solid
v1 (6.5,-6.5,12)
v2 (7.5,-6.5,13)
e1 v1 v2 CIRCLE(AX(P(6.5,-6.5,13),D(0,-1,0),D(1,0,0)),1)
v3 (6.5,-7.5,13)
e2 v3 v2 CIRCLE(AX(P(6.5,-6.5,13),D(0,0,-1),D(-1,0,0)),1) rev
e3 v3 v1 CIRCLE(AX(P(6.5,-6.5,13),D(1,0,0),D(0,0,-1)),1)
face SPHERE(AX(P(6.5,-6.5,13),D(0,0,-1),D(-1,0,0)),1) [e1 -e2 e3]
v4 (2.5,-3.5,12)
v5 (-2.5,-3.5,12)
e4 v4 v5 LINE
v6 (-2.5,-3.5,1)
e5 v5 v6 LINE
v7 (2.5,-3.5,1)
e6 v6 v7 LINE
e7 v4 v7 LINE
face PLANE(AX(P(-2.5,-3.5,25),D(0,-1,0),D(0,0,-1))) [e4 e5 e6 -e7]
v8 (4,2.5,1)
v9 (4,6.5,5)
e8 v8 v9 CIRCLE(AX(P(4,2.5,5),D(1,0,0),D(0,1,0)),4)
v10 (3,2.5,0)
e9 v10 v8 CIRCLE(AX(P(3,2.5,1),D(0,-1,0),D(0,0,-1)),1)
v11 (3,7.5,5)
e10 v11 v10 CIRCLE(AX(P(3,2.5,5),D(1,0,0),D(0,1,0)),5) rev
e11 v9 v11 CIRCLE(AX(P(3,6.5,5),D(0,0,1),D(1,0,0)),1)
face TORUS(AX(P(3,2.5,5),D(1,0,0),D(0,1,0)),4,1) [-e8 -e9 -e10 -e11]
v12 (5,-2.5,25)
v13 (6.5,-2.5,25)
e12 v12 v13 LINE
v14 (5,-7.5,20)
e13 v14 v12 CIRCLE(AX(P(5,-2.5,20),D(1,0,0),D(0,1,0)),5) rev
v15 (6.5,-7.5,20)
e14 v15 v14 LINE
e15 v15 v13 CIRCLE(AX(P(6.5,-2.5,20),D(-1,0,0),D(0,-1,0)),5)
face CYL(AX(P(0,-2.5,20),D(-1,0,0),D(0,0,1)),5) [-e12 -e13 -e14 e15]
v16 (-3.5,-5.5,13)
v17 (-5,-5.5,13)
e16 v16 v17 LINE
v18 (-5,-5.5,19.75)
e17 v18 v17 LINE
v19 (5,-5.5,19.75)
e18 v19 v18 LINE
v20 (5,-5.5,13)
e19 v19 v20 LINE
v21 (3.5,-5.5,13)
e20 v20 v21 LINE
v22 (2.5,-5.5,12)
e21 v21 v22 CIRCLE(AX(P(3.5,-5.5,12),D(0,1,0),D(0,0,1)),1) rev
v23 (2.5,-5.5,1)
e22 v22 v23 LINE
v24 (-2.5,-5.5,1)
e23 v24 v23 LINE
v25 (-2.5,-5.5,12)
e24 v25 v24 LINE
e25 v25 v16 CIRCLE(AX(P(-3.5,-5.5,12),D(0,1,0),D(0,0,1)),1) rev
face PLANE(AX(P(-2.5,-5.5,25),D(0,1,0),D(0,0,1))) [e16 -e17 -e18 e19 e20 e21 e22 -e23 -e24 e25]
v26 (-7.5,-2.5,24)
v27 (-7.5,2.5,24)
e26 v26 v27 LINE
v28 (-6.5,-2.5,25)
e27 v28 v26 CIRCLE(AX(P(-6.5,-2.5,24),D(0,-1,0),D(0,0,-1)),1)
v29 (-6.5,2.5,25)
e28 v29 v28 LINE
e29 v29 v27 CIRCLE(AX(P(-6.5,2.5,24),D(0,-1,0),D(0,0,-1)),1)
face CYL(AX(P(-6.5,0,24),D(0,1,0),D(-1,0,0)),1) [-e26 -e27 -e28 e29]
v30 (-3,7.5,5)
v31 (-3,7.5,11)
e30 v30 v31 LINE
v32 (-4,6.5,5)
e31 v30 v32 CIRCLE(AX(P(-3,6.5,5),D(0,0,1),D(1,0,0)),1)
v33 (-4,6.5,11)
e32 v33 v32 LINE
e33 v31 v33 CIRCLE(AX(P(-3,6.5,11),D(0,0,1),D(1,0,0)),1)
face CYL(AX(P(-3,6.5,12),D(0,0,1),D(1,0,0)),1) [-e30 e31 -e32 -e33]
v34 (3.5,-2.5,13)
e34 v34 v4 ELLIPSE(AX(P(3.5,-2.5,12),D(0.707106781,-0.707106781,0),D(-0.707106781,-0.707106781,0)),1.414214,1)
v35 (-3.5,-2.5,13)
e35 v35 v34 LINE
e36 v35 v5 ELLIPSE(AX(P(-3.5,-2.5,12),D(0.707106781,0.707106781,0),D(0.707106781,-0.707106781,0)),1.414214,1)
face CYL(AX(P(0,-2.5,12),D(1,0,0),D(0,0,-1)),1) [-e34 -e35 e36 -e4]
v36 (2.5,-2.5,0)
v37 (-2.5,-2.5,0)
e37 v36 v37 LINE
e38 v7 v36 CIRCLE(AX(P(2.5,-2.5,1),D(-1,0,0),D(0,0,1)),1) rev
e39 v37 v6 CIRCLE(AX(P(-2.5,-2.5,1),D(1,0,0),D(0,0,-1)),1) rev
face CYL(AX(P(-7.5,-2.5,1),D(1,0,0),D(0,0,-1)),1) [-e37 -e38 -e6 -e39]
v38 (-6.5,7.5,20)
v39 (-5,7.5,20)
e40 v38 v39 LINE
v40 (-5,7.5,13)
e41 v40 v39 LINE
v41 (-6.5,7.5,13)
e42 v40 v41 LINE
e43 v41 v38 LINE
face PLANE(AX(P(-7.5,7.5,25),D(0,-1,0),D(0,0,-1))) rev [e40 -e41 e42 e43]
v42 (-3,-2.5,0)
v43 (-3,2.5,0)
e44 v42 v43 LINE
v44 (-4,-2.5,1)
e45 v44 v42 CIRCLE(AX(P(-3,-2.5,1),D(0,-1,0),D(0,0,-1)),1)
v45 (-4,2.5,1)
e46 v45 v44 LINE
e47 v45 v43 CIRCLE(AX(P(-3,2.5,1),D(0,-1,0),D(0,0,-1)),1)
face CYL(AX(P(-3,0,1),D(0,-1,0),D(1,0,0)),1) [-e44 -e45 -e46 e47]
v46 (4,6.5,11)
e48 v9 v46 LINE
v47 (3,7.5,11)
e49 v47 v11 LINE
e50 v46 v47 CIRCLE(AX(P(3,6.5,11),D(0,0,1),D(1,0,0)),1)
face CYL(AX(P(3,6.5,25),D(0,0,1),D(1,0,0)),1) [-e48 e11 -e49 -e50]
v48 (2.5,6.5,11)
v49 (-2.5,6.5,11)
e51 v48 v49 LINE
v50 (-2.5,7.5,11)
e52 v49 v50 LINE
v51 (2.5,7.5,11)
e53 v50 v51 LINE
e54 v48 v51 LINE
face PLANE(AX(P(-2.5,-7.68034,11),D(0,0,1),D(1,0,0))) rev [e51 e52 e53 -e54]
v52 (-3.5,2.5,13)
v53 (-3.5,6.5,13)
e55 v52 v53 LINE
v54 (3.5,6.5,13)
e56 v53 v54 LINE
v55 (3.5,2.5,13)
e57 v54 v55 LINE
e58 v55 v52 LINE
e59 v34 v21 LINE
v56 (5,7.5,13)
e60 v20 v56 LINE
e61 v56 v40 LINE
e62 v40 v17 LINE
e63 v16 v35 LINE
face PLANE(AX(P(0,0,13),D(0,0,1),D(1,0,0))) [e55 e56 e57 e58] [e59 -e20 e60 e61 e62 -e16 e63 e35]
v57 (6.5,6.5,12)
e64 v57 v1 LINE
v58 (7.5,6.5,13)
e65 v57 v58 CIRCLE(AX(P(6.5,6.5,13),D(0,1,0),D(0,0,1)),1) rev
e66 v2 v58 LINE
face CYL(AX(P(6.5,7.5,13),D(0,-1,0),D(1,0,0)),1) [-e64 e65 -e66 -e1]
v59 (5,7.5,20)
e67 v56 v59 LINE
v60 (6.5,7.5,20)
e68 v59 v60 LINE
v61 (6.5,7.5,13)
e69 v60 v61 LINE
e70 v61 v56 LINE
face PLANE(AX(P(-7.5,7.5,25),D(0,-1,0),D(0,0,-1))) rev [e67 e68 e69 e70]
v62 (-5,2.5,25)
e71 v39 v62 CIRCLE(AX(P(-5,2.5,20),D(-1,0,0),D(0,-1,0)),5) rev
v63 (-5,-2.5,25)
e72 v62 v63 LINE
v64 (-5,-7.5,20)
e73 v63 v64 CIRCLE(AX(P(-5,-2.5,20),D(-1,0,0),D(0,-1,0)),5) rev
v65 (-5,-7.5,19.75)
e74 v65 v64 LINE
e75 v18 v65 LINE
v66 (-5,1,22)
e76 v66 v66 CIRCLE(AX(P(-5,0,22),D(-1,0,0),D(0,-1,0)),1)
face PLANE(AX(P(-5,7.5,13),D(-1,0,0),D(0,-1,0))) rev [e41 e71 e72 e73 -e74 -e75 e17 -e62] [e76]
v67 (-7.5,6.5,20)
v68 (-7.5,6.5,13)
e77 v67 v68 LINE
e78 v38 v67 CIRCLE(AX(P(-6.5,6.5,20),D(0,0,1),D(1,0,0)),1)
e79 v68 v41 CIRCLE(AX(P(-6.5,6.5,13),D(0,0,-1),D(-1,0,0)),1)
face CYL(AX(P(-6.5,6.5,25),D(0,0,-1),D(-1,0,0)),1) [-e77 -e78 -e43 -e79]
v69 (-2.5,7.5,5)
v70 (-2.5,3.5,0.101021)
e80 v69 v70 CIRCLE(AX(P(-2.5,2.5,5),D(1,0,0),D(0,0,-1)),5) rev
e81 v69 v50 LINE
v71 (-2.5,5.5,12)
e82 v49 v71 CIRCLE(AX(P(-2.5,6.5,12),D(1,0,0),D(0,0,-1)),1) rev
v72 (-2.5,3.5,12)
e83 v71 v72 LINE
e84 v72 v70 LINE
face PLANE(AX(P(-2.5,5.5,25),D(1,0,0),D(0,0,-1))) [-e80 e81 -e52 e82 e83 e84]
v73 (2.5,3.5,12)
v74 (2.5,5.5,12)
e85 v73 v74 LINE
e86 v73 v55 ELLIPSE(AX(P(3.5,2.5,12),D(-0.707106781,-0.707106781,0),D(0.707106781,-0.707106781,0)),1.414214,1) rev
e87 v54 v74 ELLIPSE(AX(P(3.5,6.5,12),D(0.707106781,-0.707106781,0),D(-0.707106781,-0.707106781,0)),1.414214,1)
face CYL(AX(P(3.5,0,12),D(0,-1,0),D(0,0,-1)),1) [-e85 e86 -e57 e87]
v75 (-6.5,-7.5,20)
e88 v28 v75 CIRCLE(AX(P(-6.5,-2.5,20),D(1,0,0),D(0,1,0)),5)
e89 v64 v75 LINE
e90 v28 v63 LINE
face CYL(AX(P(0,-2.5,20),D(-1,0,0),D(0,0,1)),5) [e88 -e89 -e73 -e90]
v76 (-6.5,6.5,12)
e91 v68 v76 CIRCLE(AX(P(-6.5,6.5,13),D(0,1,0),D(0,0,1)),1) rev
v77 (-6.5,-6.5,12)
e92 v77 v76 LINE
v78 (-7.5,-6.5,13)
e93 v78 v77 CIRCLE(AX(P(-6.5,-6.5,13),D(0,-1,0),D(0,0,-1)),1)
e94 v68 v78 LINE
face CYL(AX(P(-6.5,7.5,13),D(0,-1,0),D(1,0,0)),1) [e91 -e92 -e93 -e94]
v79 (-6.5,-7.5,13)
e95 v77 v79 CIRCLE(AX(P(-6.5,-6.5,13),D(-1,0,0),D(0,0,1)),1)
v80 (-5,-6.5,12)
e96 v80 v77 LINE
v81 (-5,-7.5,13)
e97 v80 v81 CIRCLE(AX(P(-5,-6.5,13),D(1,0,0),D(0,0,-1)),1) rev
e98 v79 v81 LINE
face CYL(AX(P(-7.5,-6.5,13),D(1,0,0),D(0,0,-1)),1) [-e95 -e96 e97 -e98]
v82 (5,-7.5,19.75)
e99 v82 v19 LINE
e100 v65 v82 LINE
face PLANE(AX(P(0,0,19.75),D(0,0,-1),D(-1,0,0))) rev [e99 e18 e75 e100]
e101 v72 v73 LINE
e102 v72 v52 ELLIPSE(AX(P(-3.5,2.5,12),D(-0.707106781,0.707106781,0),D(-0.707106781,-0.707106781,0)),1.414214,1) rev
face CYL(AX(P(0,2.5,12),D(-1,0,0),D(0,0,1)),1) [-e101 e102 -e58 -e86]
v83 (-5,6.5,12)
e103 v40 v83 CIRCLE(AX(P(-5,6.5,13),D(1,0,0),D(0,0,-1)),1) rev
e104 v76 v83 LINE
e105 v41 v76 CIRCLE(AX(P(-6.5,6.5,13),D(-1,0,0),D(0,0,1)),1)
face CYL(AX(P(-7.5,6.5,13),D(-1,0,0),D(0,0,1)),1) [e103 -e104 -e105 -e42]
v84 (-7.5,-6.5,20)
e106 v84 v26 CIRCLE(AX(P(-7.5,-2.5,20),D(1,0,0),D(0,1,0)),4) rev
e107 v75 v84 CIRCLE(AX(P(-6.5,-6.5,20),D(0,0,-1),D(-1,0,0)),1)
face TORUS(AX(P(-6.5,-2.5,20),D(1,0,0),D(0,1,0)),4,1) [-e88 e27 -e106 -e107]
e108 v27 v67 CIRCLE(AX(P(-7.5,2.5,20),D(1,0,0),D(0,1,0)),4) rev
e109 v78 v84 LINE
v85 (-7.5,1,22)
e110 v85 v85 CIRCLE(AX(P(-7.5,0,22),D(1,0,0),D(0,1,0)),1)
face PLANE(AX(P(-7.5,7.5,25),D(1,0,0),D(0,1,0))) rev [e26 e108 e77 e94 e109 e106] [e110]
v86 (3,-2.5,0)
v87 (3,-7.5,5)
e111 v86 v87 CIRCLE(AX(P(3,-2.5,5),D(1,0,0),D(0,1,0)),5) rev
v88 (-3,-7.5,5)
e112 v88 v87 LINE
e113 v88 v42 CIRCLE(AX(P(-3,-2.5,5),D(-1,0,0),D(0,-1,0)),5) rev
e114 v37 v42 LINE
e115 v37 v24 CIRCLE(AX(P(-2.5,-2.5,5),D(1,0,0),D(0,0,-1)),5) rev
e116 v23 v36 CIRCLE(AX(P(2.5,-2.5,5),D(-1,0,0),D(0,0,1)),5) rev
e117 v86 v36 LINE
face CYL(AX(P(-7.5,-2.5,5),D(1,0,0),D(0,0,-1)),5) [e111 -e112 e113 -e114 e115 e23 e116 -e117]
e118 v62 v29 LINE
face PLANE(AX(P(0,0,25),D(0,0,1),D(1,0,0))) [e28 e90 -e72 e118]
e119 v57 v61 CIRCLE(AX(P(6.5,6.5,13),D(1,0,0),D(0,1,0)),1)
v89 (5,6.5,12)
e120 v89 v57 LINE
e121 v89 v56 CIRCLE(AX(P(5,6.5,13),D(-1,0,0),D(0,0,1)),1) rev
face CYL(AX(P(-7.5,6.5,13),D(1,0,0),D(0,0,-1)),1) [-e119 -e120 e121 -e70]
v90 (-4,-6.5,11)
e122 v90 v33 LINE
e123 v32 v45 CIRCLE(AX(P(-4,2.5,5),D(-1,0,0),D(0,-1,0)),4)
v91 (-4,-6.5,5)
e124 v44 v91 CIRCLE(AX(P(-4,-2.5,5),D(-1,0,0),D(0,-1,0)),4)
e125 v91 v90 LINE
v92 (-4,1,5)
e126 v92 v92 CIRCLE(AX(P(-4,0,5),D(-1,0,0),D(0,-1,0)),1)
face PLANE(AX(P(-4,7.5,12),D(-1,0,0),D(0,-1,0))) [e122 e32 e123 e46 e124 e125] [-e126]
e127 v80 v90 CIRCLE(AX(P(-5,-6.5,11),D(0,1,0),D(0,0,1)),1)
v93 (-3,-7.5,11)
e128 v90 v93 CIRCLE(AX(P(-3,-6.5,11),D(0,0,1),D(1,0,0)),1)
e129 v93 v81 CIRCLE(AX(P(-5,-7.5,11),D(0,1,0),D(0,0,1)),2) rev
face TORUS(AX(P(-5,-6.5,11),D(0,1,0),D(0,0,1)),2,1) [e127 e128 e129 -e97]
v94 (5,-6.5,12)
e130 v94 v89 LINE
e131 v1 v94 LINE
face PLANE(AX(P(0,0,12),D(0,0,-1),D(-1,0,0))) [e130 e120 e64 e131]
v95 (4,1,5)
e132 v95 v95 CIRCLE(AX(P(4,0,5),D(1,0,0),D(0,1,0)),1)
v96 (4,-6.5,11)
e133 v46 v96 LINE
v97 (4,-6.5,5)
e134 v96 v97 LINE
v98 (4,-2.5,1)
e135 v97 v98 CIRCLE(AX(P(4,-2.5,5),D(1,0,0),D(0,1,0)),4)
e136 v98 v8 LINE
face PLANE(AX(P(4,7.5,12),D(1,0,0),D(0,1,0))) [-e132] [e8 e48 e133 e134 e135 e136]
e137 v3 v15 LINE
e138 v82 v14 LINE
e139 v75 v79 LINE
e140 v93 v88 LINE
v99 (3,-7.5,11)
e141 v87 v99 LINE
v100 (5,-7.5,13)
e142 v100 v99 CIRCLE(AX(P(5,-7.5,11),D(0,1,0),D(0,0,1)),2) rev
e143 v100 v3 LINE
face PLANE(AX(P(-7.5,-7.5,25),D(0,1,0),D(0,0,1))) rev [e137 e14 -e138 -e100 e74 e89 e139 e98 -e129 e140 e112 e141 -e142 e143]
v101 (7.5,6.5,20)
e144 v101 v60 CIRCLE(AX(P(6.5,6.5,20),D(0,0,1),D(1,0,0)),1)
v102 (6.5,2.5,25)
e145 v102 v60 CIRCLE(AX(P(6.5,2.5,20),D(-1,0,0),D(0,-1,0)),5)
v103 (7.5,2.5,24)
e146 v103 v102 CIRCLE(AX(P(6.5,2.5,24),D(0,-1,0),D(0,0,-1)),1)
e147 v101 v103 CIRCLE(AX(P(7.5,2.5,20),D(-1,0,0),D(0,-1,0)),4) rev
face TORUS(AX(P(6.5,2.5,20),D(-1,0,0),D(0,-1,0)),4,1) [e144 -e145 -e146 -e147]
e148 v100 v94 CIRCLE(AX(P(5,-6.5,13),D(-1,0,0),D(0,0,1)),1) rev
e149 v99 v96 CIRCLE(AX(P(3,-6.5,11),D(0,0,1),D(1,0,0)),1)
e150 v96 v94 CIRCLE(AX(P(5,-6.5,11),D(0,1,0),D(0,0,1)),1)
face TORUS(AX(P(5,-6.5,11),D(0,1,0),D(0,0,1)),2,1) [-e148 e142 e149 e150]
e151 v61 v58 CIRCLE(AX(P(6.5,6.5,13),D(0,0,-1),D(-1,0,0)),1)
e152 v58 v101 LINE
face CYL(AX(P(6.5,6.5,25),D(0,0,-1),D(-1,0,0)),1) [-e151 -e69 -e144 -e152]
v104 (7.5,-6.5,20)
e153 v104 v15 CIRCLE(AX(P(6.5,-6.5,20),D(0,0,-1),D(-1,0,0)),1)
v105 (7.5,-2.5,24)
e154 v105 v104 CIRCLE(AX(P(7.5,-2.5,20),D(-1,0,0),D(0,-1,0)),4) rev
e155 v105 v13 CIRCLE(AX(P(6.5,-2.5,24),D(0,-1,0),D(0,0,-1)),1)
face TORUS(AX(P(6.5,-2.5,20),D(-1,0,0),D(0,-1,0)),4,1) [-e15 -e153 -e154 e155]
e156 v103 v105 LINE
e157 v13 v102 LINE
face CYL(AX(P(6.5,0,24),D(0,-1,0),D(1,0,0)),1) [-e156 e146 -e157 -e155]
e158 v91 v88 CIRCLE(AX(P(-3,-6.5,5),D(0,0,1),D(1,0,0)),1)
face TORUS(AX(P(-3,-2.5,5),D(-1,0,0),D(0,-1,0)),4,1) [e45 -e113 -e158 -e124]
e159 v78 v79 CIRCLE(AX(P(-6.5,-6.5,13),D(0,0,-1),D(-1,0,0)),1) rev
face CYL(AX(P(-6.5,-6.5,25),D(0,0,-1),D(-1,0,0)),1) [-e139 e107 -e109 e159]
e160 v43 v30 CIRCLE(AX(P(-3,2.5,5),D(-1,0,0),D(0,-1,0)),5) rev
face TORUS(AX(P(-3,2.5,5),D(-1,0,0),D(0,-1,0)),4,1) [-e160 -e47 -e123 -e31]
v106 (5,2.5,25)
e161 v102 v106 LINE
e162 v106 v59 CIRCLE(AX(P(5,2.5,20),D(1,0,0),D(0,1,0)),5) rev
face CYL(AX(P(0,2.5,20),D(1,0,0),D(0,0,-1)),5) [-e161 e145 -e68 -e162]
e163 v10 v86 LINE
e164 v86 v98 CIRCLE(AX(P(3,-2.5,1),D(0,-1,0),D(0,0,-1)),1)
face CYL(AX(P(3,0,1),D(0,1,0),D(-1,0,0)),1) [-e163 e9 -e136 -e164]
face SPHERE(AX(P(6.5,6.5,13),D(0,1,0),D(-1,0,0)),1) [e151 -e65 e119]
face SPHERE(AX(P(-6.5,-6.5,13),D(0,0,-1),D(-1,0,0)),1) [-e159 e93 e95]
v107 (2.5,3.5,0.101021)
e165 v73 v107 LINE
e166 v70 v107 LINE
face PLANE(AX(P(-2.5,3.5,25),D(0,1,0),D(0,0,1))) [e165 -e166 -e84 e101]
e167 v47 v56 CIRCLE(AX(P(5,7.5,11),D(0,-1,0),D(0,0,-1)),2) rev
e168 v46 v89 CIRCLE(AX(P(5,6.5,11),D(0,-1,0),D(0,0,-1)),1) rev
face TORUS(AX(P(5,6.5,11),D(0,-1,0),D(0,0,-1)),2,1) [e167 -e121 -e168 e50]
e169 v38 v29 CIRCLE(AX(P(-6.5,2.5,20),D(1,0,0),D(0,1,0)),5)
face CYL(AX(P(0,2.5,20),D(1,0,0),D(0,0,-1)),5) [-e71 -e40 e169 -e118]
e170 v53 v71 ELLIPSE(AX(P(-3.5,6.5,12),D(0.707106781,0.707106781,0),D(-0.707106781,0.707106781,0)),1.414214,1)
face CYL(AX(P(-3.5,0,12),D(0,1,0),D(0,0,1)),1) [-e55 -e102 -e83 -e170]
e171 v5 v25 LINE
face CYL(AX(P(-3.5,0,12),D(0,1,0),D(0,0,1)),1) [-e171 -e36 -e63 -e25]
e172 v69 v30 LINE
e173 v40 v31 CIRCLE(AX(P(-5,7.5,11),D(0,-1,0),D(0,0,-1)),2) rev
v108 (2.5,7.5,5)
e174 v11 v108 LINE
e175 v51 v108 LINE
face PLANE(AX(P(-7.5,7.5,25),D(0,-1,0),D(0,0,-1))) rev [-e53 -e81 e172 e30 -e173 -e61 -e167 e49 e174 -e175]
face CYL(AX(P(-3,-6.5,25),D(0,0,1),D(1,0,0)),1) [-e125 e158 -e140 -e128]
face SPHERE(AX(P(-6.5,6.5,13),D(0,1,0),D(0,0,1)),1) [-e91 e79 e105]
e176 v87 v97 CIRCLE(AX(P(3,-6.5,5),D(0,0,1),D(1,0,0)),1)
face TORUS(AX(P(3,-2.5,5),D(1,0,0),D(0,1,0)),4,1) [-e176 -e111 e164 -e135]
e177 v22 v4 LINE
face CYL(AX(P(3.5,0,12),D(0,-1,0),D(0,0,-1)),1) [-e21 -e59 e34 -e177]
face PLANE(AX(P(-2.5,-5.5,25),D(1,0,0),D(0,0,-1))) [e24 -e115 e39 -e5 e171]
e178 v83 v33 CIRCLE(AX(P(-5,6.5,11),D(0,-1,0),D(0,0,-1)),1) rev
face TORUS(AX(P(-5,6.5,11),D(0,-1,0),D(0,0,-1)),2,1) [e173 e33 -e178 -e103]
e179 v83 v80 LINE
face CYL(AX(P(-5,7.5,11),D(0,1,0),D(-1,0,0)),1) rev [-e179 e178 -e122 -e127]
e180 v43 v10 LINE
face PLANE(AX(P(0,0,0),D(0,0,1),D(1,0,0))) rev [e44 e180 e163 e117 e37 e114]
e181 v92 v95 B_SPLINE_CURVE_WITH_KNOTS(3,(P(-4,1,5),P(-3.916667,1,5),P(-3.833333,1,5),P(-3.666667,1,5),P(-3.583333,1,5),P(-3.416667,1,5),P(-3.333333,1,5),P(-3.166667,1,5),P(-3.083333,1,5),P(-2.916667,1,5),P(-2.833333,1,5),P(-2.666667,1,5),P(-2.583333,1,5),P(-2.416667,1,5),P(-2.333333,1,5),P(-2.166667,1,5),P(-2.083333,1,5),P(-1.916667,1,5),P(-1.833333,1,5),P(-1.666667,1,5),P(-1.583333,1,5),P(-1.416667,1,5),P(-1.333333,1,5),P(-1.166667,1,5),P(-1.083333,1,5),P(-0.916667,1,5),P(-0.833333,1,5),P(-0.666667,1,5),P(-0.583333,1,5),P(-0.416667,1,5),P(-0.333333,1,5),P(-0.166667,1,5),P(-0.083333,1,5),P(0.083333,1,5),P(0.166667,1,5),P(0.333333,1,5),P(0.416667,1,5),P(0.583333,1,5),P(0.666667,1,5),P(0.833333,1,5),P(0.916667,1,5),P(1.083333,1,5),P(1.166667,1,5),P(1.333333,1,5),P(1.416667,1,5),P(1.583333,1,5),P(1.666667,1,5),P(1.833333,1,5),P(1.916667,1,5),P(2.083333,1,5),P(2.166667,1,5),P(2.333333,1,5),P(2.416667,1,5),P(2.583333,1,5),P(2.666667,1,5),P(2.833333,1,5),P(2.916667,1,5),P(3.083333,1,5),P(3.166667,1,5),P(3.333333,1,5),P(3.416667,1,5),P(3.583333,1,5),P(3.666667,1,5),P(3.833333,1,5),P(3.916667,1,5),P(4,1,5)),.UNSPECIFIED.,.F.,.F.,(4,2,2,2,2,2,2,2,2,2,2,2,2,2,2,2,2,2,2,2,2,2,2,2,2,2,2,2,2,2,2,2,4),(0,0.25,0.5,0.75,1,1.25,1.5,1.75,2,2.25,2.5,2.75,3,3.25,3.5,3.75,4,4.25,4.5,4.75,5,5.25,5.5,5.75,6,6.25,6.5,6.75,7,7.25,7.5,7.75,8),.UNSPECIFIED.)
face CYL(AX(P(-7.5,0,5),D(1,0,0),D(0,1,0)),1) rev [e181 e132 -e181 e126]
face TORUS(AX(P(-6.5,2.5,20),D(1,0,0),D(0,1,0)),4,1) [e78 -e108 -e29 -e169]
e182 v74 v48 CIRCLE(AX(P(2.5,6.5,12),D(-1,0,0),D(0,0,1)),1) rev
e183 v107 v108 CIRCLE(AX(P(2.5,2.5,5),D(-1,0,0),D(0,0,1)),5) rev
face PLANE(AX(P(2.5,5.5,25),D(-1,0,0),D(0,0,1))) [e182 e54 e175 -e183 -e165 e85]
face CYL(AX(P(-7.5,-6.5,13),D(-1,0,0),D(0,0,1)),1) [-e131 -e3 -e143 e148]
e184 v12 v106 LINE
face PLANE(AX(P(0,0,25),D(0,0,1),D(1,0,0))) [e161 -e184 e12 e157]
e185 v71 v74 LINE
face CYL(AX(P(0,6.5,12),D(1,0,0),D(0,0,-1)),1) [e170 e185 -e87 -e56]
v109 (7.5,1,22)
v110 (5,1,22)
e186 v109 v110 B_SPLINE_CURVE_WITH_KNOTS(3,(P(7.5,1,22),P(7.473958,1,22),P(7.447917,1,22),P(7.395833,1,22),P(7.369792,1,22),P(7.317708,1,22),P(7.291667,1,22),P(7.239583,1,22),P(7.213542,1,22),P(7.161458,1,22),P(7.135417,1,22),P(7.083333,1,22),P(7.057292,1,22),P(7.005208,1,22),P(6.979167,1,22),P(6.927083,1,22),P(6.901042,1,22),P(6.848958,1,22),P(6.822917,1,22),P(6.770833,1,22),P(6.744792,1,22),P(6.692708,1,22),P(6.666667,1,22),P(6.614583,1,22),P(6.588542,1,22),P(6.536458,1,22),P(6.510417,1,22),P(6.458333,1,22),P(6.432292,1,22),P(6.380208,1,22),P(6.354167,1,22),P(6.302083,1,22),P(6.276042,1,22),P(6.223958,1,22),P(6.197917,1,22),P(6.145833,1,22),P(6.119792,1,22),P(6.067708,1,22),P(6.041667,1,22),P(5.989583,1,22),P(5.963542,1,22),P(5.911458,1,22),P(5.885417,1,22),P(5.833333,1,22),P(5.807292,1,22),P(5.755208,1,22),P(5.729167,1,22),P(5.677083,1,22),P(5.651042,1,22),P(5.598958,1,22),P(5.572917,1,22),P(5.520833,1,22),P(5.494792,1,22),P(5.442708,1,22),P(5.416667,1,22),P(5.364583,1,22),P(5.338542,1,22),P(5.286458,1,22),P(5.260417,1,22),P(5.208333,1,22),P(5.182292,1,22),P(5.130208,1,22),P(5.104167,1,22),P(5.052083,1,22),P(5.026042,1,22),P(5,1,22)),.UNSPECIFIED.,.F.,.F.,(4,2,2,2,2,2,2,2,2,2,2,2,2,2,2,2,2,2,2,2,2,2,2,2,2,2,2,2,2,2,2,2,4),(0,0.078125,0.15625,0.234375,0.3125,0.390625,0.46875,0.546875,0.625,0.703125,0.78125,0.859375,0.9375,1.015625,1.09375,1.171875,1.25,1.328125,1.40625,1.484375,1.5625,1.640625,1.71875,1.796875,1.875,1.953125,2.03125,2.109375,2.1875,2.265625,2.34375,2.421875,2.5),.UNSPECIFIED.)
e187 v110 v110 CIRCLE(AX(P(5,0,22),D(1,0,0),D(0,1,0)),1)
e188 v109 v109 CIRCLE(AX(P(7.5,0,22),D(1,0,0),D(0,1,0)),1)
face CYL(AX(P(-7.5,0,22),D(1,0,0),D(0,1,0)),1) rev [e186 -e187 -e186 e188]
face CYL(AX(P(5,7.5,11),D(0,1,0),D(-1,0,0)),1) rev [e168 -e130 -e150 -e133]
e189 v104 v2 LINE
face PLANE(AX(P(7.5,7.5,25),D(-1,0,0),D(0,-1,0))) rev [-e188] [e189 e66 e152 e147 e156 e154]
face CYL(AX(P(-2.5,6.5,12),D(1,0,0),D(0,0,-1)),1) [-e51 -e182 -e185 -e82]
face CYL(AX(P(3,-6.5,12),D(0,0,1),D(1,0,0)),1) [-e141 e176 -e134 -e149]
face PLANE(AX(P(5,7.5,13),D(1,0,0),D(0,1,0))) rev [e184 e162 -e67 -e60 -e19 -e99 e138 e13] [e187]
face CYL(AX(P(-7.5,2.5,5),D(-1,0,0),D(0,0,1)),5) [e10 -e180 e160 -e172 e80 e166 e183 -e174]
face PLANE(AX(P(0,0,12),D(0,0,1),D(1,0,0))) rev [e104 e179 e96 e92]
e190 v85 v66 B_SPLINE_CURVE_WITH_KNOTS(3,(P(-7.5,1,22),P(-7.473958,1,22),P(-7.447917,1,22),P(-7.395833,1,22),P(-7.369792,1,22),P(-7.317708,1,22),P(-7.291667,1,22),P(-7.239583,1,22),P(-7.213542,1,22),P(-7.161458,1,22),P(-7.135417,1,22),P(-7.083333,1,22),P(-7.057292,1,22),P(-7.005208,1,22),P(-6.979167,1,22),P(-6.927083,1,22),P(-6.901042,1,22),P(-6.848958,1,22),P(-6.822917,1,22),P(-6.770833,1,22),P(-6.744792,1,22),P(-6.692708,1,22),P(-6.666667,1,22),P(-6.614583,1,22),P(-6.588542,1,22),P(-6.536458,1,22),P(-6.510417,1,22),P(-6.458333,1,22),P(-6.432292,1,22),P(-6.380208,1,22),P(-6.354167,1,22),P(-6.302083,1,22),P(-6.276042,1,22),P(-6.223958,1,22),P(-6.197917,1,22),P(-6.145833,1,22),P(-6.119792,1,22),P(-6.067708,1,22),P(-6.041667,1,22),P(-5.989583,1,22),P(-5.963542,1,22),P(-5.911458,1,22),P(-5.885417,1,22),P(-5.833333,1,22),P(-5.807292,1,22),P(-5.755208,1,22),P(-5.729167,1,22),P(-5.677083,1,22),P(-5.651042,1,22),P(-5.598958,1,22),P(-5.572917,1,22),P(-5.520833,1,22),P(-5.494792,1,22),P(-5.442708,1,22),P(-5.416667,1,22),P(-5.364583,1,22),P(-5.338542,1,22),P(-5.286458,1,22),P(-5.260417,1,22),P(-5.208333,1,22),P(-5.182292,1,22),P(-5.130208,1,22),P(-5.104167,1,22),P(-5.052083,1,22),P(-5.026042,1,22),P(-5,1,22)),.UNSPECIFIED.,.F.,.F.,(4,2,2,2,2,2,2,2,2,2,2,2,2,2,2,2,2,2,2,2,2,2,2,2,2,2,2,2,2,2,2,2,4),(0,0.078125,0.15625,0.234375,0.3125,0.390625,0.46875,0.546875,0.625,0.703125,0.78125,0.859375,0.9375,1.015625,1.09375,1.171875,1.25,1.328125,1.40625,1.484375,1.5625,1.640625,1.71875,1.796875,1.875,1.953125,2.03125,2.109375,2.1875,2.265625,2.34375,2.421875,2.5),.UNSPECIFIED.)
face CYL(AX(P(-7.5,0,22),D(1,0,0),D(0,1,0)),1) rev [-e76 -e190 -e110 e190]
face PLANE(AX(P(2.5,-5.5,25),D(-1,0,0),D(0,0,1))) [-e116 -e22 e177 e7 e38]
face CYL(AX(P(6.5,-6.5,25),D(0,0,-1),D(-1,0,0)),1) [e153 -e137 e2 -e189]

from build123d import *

# Parameters (mm, degrees)
BASE_SKETCH_W                    = 15
BASE_SKETCH_H                    = 15
BASE_SKETCH_EXTRUDE_DEPTH        = 25
CENTER_NUB_CUTOUT_SKETCH_W       = 3.5
CENTER_NUB_CUTOUT_SKETCH_H       = 15
HINGE_NUB_EXTRUDED_CUT_DEPTH     = 12
HINGE_CUTOUT_SKETCH_W            = 10
HINGE_CUTOUT_SKETCH_H            = 15
HINGE_CUTOUT_EXTRUDED_CUT_DEPTH  = 12
HINGE_HOLE_SKETCH_R              = 1
HINGE_HOLE_EXTRUDED_CUT_DEPTH    = 31.103986447
CORNER_FILLETS_R                 = 5
STYLE_FILLETS_R                  = 1
ROUTING_HOLES_SKETCH_W           = 5
ROUTING_HOLES_SKETCH_H           = 2
ROUTING_HOLES_EXTRUDED_CUT_DEPTH = 28.156951228
SKETCH1_W                        = 10
SKETCH1_H                        = 2
BACKING_EXTRUDE_DEPTH            = 6.75
EXTRA_ROUTING_CUT_SKETCH_W       = 5
EXTRA_ROUTING_CUT_SKETCH_H       = 10
EXTRA_ROUTING_EXTRUDED_CUT_DEPTH = 4
ROUTING_FILLETS_R                = 1


with BuildPart() as part:
    # Base Sketch → Base Sketch Extrude (new body)
    with BuildSketch(Plane.XY):
        Rectangle(BASE_SKETCH_W, BASE_SKETCH_H)
    extrude(amount=BASE_SKETCH_EXTRUDE_DEPTH)

    # Center Nub Cutout Sketch → Hinge Nub Extruded Cut (cut)
    with BuildSketch(Plane.XY):
        with Locations((5.75, 0)):
            Rectangle(CENTER_NUB_CUTOUT_SKETCH_W, CENTER_NUB_CUTOUT_SKETCH_H)
        with Locations((-5.75, 0)):
            Rectangle(CENTER_NUB_CUTOUT_SKETCH_W, CENTER_NUB_CUTOUT_SKETCH_H)
    extrude(amount=HINGE_NUB_EXTRUDED_CUT_DEPTH, mode=Mode.SUBTRACT)

    # Hinge Cutout Sketch → Hinge Cutout Extruded Cut (cut)
    with BuildSketch(Plane.XY.offset(25)):
        Rectangle(HINGE_CUTOUT_SKETCH_W, HINGE_CUTOUT_SKETCH_H)
    extrude(amount=-HINGE_CUTOUT_EXTRUDED_CUT_DEPTH, mode=Mode.SUBTRACT)

    # Hinge Hole Sketch → Hinge Hole Extruded Cut (cut, through all)
    with BuildSketch(Plane(origin=(7.5, 0, 0), x_dir=(0, 0, -1), z_dir=(1, 0, 0))):
        with Locations(Location((-5, 0, 0), (0, 0, 90))):
            Circle(HINGE_HOLE_SKETCH_R)
        with Locations(Location((-22, 0, 0), (0, 0, 90))):
            Circle(HINGE_HOLE_SKETCH_R)
    extrude(amount=-HINGE_HOLE_EXTRUDED_CUT_DEPTH, mode=Mode.SUBTRACT)

    # Corner Fillets
    corner_fillets_edges = [part.edges().sort_by_distance(p)[0] for p in [
        (0, -7.5, 0),
        (0, 7.5, 0),
        (-6.25, -7.5, 25),
        (-6.25, 7.5, 25),
        (6.25, -7.5, 25),
        (6.25, 7.5, 25),
    ]]
    fillet(corner_fillets_edges, radius=CORNER_FILLETS_R)

    # Style Fillets
    style_fillets_edges = [part.edges().sort_by_distance(p)[0] for p in [
        (4, 7.5, 8.5),
        (4, -7.5, 8.5),
        (7.5, 0, 12),
        (5.75, 7.5, 12),
        (4, 0, 12),
        (5.75, -7.5, 12),
        (-4, -7.5, 8.5),
        (-4, 7.5, 8.5),
        (-7.5, 0, 12),
        (-5.75, -7.5, 12),
        (-4, 0, 12),
        (-5.75, 7.5, 12),
        (-7.5, 0, 25),
        (-7.5, -7.5, 16),
        (7.5, -7.5, 16),
        (-7.5, 7.5, 16),
        (-7.5, 6.035533906, 23.535533906),
        (-7.5, -6.035533906, 23.535533906),
        (7.5, 7.5, 16),
        (7.5, 0, 25),
        (7.5, 6.035533906, 23.535533906),
        (7.5, -6.035533906, 23.535533906),
        (4, 0, 0),
        (4, 6.035533906, 1.464466094),
        (4, -6.035533906, 1.464466094),
        (-4, 0, 0),
        (-4, 6.035533906, 1.464466094),
        (-4, -6.035533906, 1.464466094),
    ]]
    fillet(style_fillets_edges, radius=STYLE_FILLETS_R)

    # Routing Holes Sketch → Routing Holes Extruded Cut (cut, through all)
    with BuildSketch(Plane.XY):
        with Locations((0, 4.5)):
            Rectangle(ROUTING_HOLES_SKETCH_W, ROUTING_HOLES_SKETCH_H)
        with Locations((0, -4.5)):
            Rectangle(ROUTING_HOLES_SKETCH_W, ROUTING_HOLES_SKETCH_H)
    extrude(amount=ROUTING_HOLES_EXTRUDED_CUT_DEPTH, mode=Mode.SUBTRACT)

    # Sketch1 → Backing Extrude (add)
    with BuildSketch(Plane.XY.offset(13)):
        with Locations((0, -6.5)):
            Rectangle(SKETCH1_W, SKETCH1_H)
    extrude(amount=BACKING_EXTRUDE_DEPTH)

    # Extra Routing Cut Sketch → Extra Routing Extruded Cut (cut)
    with BuildSketch(Plane(origin=(0, 7.5, 0), x_dir=(1, 0, 0), z_dir=(0, 1, 0))):
        with Locations((0, -6)):
            Rectangle(EXTRA_ROUTING_CUT_SKETCH_W, EXTRA_ROUTING_CUT_SKETCH_H)
    extrude(amount=-EXTRA_ROUTING_EXTRUDED_CUT_DEPTH, mode=Mode.SUBTRACT)

    # Routing Fillets
    routing_fillets_edges = [part.edges().sort_by_distance(p)[0] for p in [
        (0, -3.5, 0.101020514),
        (2.5, -4.5, 13),
        (0, -3.5, 13),
        (-2.5, -4.5, 13),
        (2.5, 4.5, 13),
        (0, 3.5, 13),
        (-2.5, 4.5, 13),
        (0, 5.5, 13),
        (0, 5.5, 11),
    ]]
    fillet(routing_fillets_edges, radius=ROUTING_FILLETS_R - 0.0001)  # a hair under: the kernel refuses the full size


solid = part.part
